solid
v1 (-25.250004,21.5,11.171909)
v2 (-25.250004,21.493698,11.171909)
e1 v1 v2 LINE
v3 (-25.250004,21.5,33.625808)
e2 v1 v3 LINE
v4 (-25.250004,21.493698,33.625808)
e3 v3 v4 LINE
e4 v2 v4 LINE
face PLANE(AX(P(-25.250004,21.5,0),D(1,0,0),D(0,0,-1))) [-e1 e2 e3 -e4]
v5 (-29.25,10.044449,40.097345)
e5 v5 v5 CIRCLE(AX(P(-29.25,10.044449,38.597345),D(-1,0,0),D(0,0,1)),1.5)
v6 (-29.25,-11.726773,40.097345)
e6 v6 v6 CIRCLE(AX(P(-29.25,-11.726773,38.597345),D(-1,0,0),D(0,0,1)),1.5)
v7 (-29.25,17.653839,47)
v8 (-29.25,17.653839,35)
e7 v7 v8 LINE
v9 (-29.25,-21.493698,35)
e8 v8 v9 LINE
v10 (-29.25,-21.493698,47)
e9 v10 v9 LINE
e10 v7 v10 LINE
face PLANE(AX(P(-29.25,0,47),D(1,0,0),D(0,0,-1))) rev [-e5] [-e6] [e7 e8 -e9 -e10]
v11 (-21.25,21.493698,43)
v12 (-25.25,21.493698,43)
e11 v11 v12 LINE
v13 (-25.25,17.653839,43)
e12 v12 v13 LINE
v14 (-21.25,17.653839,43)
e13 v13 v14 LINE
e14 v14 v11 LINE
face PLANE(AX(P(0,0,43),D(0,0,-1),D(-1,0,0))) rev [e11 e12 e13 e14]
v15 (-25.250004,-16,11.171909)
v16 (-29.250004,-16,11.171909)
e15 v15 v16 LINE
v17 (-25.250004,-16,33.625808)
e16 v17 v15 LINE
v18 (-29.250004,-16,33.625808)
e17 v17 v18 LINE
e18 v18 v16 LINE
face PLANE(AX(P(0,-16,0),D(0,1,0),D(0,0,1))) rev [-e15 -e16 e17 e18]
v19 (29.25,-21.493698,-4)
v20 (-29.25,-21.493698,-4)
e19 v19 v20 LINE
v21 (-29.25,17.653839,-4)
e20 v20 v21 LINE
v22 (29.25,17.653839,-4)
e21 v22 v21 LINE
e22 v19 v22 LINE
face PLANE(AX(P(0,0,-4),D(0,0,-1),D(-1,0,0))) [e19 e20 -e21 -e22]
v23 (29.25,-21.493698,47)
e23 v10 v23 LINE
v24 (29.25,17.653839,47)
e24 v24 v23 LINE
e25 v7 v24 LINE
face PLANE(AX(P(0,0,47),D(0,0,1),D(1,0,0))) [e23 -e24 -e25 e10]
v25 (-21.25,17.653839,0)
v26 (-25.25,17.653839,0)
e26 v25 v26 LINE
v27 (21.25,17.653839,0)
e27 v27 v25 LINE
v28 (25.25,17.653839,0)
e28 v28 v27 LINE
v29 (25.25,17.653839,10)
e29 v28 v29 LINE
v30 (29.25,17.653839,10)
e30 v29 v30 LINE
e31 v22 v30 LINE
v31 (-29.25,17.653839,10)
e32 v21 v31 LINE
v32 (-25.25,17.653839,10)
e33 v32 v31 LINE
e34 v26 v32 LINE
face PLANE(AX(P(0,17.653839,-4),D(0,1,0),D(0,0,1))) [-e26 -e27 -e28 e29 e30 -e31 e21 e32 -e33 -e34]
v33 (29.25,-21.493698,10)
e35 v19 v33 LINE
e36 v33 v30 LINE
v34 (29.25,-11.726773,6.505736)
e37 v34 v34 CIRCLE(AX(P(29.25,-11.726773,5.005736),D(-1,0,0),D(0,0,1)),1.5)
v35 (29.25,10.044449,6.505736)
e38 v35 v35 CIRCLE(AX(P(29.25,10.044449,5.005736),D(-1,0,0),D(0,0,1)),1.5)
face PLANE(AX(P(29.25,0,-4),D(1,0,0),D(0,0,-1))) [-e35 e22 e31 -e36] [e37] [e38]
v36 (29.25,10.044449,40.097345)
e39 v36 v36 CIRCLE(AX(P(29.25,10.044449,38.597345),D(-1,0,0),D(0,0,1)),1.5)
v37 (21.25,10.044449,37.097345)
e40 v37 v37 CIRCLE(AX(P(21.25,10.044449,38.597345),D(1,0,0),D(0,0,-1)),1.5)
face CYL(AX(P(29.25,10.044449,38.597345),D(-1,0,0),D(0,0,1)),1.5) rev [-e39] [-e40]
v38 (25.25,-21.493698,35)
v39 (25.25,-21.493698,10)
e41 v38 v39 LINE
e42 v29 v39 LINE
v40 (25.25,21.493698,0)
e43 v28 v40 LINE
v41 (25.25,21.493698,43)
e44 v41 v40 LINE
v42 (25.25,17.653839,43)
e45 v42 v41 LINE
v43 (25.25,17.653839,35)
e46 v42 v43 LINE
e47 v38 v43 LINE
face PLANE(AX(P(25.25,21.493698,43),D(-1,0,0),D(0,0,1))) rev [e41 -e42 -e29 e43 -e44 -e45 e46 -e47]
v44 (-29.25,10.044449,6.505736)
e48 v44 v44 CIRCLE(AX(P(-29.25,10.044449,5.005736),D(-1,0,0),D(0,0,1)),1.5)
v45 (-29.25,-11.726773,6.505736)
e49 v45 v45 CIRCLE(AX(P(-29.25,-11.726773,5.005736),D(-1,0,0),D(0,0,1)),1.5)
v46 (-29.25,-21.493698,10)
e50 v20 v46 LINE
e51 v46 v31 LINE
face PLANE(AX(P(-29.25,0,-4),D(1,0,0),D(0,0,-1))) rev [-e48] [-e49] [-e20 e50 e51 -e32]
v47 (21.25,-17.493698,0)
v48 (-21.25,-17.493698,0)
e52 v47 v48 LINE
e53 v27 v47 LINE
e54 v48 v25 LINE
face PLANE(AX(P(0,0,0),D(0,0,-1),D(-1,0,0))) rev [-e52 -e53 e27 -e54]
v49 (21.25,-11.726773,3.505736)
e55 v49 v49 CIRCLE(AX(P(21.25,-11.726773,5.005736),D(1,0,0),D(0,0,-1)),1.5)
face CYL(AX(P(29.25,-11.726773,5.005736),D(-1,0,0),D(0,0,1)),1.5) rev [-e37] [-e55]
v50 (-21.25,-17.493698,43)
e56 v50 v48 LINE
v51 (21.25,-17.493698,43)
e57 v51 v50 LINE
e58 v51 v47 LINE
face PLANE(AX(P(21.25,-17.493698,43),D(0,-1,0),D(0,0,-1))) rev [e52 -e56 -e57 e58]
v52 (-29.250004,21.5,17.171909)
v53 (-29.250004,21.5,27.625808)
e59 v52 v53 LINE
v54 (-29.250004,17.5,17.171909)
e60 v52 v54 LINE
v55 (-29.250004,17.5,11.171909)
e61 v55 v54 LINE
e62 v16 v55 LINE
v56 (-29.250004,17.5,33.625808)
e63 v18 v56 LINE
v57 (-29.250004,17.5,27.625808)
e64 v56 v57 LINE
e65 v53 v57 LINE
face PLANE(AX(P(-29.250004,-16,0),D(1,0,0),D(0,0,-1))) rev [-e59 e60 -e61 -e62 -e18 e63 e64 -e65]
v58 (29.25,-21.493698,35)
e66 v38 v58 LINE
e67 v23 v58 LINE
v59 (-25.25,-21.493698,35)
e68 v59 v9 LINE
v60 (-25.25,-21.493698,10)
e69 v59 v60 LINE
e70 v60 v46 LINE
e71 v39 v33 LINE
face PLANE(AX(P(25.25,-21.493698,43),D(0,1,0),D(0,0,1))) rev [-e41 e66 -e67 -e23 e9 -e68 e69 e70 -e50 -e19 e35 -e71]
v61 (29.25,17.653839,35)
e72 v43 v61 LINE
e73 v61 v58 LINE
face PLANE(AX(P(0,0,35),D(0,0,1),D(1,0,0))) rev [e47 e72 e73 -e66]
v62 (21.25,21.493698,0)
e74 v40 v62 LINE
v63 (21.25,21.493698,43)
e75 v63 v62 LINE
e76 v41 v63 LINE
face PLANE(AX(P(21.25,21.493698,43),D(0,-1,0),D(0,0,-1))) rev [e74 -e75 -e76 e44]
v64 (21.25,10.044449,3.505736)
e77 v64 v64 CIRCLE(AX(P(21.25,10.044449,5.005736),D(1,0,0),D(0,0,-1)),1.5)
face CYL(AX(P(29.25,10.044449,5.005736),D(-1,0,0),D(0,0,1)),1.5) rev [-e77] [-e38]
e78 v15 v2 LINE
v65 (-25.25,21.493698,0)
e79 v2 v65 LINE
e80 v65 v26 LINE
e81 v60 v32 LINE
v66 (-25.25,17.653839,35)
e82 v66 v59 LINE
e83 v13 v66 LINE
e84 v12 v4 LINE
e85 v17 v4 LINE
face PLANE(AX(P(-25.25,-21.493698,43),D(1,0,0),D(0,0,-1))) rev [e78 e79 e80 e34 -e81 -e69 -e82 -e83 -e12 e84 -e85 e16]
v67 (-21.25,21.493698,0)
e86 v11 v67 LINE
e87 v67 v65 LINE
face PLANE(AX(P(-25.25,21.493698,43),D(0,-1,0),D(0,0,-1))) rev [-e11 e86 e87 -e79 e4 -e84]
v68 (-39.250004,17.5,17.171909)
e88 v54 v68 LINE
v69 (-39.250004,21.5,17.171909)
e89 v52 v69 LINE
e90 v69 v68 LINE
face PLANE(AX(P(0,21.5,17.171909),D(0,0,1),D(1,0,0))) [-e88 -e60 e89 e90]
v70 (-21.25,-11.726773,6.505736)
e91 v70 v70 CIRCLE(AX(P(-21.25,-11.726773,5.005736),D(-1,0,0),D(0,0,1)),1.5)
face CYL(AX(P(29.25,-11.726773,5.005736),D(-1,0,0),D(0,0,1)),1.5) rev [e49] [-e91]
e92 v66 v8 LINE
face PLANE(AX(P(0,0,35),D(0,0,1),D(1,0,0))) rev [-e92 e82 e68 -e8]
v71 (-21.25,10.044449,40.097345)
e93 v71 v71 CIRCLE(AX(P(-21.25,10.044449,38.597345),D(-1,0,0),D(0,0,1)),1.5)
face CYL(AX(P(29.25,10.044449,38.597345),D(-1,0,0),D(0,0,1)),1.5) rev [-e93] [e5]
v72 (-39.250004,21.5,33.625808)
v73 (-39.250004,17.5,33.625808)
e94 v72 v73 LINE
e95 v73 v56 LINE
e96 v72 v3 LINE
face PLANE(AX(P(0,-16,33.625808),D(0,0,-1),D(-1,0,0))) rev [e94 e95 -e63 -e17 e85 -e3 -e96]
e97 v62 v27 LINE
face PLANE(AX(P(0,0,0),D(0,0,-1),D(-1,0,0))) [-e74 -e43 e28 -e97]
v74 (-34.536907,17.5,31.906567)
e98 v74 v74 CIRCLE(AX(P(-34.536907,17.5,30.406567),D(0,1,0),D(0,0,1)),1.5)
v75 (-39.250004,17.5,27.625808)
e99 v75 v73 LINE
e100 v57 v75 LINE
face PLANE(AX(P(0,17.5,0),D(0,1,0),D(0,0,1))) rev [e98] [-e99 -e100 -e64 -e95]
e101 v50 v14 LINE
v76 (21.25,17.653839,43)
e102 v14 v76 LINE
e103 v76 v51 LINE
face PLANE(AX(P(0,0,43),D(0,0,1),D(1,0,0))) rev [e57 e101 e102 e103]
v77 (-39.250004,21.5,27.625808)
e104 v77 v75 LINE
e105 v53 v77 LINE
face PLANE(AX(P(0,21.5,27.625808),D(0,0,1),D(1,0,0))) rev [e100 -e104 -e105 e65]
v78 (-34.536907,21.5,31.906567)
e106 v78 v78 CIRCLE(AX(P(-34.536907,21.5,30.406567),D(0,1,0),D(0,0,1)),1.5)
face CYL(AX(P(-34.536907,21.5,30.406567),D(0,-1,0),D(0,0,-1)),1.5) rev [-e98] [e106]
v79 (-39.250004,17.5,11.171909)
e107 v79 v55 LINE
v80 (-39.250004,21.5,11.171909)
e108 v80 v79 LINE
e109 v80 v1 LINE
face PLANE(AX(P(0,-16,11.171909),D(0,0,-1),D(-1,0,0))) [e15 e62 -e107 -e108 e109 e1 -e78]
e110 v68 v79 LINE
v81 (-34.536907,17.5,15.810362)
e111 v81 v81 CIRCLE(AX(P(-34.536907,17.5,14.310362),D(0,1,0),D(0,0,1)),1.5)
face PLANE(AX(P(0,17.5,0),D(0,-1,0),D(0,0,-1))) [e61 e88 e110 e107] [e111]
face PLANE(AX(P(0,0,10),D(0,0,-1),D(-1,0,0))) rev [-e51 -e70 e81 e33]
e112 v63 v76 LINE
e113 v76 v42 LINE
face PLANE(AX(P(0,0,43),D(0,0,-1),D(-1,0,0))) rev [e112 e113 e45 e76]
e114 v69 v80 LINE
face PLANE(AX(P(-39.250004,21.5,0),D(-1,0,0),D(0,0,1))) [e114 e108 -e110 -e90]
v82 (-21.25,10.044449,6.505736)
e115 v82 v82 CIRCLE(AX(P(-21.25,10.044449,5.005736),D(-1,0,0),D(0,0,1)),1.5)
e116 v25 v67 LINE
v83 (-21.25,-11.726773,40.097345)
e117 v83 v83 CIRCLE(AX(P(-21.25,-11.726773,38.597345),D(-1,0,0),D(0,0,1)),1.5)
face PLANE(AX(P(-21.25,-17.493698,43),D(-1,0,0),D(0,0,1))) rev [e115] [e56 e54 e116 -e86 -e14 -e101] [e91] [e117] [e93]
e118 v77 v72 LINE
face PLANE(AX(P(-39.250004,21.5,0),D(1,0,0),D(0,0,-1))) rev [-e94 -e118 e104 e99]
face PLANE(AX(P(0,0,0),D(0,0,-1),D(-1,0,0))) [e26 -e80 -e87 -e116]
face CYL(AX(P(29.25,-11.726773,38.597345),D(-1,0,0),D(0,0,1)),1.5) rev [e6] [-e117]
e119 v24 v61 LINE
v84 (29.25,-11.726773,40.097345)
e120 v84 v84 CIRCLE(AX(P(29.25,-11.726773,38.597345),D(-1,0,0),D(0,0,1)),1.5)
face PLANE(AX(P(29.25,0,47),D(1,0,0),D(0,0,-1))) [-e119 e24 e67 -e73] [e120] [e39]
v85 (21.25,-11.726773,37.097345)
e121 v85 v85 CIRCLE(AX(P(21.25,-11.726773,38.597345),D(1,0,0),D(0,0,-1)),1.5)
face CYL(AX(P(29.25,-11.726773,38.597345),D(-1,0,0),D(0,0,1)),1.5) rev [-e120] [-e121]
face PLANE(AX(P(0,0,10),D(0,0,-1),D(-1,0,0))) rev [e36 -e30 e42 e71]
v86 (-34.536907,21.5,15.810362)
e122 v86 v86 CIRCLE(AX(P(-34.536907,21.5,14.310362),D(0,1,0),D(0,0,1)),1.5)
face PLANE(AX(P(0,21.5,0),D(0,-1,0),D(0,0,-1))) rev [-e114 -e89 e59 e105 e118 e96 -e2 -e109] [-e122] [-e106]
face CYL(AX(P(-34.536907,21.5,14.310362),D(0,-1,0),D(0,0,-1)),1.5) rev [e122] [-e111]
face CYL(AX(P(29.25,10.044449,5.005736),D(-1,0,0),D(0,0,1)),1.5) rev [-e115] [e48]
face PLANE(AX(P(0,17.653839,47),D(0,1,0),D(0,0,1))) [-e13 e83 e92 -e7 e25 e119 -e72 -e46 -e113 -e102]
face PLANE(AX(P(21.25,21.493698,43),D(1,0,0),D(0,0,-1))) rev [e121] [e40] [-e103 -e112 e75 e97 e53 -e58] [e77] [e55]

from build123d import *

# Parameters (mm, degrees)
BOSS_EXTRUDE1_DEPTH      = 43
SKETCH4_W                = 50.5
SKETCH4_H                = 39.147537046
BOSS_EXTRUDE2_DEPTH      = 4
SKETCH5_W                = 50.5
SKETCH5_H                = 39.147537046
BOSS_EXTRUDE3_DEPTH      = 4
BOSS_EXTRUDE4_DEPTH      = 17.5
BOSS_EXTRUDE4_DEPTH_BACK = 16
BOSS_EXTRUDE5_START      = 17.5
SKETCH3_3_W              = 10
SKETCH3_3_H              = 6
SKETCH3_3_R              = 1.5
BOSS_EXTRUDE5_DEPTH      = 4
BOSS_EXTRUDE5_2_DEPTH    = 4
BOSS_EXTRUDE6_START      = 17.5
BOSS_EXTRUDE6_DEPTH      = 4
BOSS_EXTRUDE7_DEPTH      = 4
BOSS_EXTRUDE7_DEPTH_BACK = 10
SKETCH5_3_W              = 4
SKETCH5_3_H              = 39.147537046
BOSS_EXTRUDE8_DEPTH      = 4
BOSS_EXTRUDE8_DEPTH_BACK = 8
SKETCH8_R                = 1.5
CUT_EXTRUDE1_DEPTH       = 79.060873682
SKETCH11_R               = 1.5
CUT_EXTRUDE2_DEPTH       = 79.060873682


with BuildPart() as part:
    # Sketch1 → Boss-Extrude1 (new body)
    with BuildSketch(Plane.XY):
        Polygon((-21.25, -17.493697991), (-21.25, 21.493697991), (-25.25, 21.493697991), (-25.25, -21.493697991), (25.25, -21.493697991), (25.25, 21.493697991), (21.25, 21.493697991), (21.25, -17.493697991), align=None)
    extrude(amount=BOSS_EXTRUDE1_DEPTH)

    # Sketch4 → Boss-Extrude2 (add)
    with BuildSketch(Plane.XY.offset(43)):
        with Locations((0, -1.919929468)):
            Rectangle(SKETCH4_W, SKETCH4_H)
    extrude(amount=BOSS_EXTRUDE2_DEPTH)

    # Sketch5 → Boss-Extrude3 (add)
    with BuildSketch(Plane(origin=(0, 0, 0), x_dir=(-1, 0, 0), z_dir=(0, 0, -1))):
        with Locations((0, -1.919929468)):
            Rectangle(SKETCH5_W, SKETCH5_H)
    extrude(amount=BOSS_EXTRUDE3_DEPTH)


with BuildPart() as boss_extrude4_tool:
    # Sketch3 → Boss-Extrude4 (new, two sides: drawn at the far end of the back side and taken through both)
    with BuildSketch(Plane(origin=(0, 0, 0), x_dir=(1, 0, 0), z_dir=(0, 1, 0)).offset(-BOSS_EXTRUDE4_DEPTH_BACK)):
        Polygon((-29.250003781, -33.625807881), (-25.250003781, -33.625807881), (-25.250003781, -11.171909281), (-29.250003781, -11.171909281), (-29.250003781, -17.171909281), (-29.250003781, -27.625807881), align=None)
    extrude(amount=BOSS_EXTRUDE4_DEPTH + BOSS_EXTRUDE4_DEPTH_BACK)


with BuildPart() as part_1:
    add(part.part)


with BuildPart() as part_2:
    # Boss-Extrude4: joined with boss_extrude4_tool
    add(part_1.part.fuse(boss_extrude4_tool.part, tol=0.00001))


with BuildPart() as body_2:
    # Sketch3<3> → Boss-Extrude5 (new body)
    with BuildSketch(Plane(origin=(0, 0, 0), x_dir=(1, 0, 0), z_dir=(0, 1, 0)).offset(BOSS_EXTRUDE5_START)):
        with Locations((-34.250003781, -30.625807881)):
            Rectangle(SKETCH3_3_W, SKETCH3_3_H)
        with Locations(Location((-34.536906803, -30.406566851, 0), (0, 0, 270))):
            Circle(SKETCH3_3_R, mode=Mode.SUBTRACT)
    extrude(amount=BOSS_EXTRUDE5_DEPTH)


with BuildPart() as body_3:
    # Sketch3<3> → Boss-Extrude5 2 (new body)
    with BuildSketch(Plane(origin=(0, 0, 0), x_dir=(1, 0, 0), z_dir=(0, 1, 0)).offset(BOSS_EXTRUDE5_START)):
        with Locations((-34.250003781, -14.171909281)):
            Rectangle(SKETCH3_3_W, SKETCH3_3_H)
        with Locations(Location((-34.536906803, -14.310361699, 0), (0, 0, 270))):
            Circle(SKETCH3_3_R, mode=Mode.SUBTRACT)
    extrude(amount=BOSS_EXTRUDE5_2_DEPTH)


with BuildPart() as boss_extrude6_tool:
    # Sketch3<4> → Boss-Extrude6 (new body)
    with BuildSketch(Plane(origin=(0, 0, 0), x_dir=(1, 0, 0), z_dir=(0, 1, 0)).offset(BOSS_EXTRUDE6_START)):
        Polygon((-29.250003781, -33.625807881), (-25.250003781, -33.625807881), (-25.250003781, -11.171909281), (-29.250003781, -11.171909281), (-29.250003781, -17.171909281), (-29.250003781, -27.625807881), align=None)
    extrude(amount=BOSS_EXTRUDE6_DEPTH)


with BuildPart() as part_3:
    add(part_2.part)


with BuildPart() as part_4:
    # Boss-Extrude6: joined with boss_extrude6_tool
    add(part_3.part.fuse(boss_extrude6_tool.part, body_2.part, body_3.part, tol=0.00001))

    # Sketch5<3> → Boss-Extrude7 (add, two sides: drawn at the far end of the back side and taken through both)
    with BuildSketch(Plane(origin=(0, 0, 0), x_dir=(-1, 0, 0), z_dir=(0, 0, -1)).offset(-BOSS_EXTRUDE7_DEPTH_BACK)):
        with Locations((-27.25, -1.919929468)):
            Rectangle(SKETCH5_3_W, SKETCH5_3_H)
        with Locations((27.25, -1.919929468)):
            Rectangle(SKETCH5_3_W, SKETCH5_3_H)
    extrude(amount=BOSS_EXTRUDE7_DEPTH + BOSS_EXTRUDE7_DEPTH_BACK)

    # Sketch4<3> → Boss-Extrude8 (add, two sides: drawn at the far end of the back side and taken through both)
    with BuildSketch(Plane.XY.offset(43).offset(-BOSS_EXTRUDE8_DEPTH_BACK)):
        Polygon((29.25, 17.653839055), (25.25, 17.653839055), (25.25, -21.493697991), (29.25, -21.493697991), (29.25, -17.493697991), (29.25, 13.653839055), align=None)
        Polygon((-25.25, -21.493697991), (-25.25, 17.653839055), (-29.25, 17.653839055), (-29.25, 13.653839055), (-29.25, -17.493697991), (-29.25, -21.493697991), align=None)
    extrude(amount=BOSS_EXTRUDE8_DEPTH + BOSS_EXTRUDE8_DEPTH_BACK)

    # Sketch8 → Cut-Extrude1 (cut, through all)
    with BuildSketch(Plane.ZY.offset(29.25)):
        with Locations((5.005736184, 10.04444872)):
            Circle(SKETCH8_R)
        with Locations((5.005736184, -11.726773354)):
            Circle(SKETCH8_R)
    extrude(amount=-CUT_EXTRUDE1_DEPTH, mode=Mode.SUBTRACT)

    # Sketch11 → Cut-Extrude2 (cut, through all)
    with BuildSketch(Plane.ZY.offset(29.25)):
        with Locations((38.59734476, -11.726773354)):
            Circle(SKETCH11_R)
        with Locations((38.59734476, 10.04444872)):
            Circle(SKETCH11_R)
    extrude(amount=-CUT_EXTRUDE2_DEPTH, mode=Mode.SUBTRACT)


solid = part_4.part
